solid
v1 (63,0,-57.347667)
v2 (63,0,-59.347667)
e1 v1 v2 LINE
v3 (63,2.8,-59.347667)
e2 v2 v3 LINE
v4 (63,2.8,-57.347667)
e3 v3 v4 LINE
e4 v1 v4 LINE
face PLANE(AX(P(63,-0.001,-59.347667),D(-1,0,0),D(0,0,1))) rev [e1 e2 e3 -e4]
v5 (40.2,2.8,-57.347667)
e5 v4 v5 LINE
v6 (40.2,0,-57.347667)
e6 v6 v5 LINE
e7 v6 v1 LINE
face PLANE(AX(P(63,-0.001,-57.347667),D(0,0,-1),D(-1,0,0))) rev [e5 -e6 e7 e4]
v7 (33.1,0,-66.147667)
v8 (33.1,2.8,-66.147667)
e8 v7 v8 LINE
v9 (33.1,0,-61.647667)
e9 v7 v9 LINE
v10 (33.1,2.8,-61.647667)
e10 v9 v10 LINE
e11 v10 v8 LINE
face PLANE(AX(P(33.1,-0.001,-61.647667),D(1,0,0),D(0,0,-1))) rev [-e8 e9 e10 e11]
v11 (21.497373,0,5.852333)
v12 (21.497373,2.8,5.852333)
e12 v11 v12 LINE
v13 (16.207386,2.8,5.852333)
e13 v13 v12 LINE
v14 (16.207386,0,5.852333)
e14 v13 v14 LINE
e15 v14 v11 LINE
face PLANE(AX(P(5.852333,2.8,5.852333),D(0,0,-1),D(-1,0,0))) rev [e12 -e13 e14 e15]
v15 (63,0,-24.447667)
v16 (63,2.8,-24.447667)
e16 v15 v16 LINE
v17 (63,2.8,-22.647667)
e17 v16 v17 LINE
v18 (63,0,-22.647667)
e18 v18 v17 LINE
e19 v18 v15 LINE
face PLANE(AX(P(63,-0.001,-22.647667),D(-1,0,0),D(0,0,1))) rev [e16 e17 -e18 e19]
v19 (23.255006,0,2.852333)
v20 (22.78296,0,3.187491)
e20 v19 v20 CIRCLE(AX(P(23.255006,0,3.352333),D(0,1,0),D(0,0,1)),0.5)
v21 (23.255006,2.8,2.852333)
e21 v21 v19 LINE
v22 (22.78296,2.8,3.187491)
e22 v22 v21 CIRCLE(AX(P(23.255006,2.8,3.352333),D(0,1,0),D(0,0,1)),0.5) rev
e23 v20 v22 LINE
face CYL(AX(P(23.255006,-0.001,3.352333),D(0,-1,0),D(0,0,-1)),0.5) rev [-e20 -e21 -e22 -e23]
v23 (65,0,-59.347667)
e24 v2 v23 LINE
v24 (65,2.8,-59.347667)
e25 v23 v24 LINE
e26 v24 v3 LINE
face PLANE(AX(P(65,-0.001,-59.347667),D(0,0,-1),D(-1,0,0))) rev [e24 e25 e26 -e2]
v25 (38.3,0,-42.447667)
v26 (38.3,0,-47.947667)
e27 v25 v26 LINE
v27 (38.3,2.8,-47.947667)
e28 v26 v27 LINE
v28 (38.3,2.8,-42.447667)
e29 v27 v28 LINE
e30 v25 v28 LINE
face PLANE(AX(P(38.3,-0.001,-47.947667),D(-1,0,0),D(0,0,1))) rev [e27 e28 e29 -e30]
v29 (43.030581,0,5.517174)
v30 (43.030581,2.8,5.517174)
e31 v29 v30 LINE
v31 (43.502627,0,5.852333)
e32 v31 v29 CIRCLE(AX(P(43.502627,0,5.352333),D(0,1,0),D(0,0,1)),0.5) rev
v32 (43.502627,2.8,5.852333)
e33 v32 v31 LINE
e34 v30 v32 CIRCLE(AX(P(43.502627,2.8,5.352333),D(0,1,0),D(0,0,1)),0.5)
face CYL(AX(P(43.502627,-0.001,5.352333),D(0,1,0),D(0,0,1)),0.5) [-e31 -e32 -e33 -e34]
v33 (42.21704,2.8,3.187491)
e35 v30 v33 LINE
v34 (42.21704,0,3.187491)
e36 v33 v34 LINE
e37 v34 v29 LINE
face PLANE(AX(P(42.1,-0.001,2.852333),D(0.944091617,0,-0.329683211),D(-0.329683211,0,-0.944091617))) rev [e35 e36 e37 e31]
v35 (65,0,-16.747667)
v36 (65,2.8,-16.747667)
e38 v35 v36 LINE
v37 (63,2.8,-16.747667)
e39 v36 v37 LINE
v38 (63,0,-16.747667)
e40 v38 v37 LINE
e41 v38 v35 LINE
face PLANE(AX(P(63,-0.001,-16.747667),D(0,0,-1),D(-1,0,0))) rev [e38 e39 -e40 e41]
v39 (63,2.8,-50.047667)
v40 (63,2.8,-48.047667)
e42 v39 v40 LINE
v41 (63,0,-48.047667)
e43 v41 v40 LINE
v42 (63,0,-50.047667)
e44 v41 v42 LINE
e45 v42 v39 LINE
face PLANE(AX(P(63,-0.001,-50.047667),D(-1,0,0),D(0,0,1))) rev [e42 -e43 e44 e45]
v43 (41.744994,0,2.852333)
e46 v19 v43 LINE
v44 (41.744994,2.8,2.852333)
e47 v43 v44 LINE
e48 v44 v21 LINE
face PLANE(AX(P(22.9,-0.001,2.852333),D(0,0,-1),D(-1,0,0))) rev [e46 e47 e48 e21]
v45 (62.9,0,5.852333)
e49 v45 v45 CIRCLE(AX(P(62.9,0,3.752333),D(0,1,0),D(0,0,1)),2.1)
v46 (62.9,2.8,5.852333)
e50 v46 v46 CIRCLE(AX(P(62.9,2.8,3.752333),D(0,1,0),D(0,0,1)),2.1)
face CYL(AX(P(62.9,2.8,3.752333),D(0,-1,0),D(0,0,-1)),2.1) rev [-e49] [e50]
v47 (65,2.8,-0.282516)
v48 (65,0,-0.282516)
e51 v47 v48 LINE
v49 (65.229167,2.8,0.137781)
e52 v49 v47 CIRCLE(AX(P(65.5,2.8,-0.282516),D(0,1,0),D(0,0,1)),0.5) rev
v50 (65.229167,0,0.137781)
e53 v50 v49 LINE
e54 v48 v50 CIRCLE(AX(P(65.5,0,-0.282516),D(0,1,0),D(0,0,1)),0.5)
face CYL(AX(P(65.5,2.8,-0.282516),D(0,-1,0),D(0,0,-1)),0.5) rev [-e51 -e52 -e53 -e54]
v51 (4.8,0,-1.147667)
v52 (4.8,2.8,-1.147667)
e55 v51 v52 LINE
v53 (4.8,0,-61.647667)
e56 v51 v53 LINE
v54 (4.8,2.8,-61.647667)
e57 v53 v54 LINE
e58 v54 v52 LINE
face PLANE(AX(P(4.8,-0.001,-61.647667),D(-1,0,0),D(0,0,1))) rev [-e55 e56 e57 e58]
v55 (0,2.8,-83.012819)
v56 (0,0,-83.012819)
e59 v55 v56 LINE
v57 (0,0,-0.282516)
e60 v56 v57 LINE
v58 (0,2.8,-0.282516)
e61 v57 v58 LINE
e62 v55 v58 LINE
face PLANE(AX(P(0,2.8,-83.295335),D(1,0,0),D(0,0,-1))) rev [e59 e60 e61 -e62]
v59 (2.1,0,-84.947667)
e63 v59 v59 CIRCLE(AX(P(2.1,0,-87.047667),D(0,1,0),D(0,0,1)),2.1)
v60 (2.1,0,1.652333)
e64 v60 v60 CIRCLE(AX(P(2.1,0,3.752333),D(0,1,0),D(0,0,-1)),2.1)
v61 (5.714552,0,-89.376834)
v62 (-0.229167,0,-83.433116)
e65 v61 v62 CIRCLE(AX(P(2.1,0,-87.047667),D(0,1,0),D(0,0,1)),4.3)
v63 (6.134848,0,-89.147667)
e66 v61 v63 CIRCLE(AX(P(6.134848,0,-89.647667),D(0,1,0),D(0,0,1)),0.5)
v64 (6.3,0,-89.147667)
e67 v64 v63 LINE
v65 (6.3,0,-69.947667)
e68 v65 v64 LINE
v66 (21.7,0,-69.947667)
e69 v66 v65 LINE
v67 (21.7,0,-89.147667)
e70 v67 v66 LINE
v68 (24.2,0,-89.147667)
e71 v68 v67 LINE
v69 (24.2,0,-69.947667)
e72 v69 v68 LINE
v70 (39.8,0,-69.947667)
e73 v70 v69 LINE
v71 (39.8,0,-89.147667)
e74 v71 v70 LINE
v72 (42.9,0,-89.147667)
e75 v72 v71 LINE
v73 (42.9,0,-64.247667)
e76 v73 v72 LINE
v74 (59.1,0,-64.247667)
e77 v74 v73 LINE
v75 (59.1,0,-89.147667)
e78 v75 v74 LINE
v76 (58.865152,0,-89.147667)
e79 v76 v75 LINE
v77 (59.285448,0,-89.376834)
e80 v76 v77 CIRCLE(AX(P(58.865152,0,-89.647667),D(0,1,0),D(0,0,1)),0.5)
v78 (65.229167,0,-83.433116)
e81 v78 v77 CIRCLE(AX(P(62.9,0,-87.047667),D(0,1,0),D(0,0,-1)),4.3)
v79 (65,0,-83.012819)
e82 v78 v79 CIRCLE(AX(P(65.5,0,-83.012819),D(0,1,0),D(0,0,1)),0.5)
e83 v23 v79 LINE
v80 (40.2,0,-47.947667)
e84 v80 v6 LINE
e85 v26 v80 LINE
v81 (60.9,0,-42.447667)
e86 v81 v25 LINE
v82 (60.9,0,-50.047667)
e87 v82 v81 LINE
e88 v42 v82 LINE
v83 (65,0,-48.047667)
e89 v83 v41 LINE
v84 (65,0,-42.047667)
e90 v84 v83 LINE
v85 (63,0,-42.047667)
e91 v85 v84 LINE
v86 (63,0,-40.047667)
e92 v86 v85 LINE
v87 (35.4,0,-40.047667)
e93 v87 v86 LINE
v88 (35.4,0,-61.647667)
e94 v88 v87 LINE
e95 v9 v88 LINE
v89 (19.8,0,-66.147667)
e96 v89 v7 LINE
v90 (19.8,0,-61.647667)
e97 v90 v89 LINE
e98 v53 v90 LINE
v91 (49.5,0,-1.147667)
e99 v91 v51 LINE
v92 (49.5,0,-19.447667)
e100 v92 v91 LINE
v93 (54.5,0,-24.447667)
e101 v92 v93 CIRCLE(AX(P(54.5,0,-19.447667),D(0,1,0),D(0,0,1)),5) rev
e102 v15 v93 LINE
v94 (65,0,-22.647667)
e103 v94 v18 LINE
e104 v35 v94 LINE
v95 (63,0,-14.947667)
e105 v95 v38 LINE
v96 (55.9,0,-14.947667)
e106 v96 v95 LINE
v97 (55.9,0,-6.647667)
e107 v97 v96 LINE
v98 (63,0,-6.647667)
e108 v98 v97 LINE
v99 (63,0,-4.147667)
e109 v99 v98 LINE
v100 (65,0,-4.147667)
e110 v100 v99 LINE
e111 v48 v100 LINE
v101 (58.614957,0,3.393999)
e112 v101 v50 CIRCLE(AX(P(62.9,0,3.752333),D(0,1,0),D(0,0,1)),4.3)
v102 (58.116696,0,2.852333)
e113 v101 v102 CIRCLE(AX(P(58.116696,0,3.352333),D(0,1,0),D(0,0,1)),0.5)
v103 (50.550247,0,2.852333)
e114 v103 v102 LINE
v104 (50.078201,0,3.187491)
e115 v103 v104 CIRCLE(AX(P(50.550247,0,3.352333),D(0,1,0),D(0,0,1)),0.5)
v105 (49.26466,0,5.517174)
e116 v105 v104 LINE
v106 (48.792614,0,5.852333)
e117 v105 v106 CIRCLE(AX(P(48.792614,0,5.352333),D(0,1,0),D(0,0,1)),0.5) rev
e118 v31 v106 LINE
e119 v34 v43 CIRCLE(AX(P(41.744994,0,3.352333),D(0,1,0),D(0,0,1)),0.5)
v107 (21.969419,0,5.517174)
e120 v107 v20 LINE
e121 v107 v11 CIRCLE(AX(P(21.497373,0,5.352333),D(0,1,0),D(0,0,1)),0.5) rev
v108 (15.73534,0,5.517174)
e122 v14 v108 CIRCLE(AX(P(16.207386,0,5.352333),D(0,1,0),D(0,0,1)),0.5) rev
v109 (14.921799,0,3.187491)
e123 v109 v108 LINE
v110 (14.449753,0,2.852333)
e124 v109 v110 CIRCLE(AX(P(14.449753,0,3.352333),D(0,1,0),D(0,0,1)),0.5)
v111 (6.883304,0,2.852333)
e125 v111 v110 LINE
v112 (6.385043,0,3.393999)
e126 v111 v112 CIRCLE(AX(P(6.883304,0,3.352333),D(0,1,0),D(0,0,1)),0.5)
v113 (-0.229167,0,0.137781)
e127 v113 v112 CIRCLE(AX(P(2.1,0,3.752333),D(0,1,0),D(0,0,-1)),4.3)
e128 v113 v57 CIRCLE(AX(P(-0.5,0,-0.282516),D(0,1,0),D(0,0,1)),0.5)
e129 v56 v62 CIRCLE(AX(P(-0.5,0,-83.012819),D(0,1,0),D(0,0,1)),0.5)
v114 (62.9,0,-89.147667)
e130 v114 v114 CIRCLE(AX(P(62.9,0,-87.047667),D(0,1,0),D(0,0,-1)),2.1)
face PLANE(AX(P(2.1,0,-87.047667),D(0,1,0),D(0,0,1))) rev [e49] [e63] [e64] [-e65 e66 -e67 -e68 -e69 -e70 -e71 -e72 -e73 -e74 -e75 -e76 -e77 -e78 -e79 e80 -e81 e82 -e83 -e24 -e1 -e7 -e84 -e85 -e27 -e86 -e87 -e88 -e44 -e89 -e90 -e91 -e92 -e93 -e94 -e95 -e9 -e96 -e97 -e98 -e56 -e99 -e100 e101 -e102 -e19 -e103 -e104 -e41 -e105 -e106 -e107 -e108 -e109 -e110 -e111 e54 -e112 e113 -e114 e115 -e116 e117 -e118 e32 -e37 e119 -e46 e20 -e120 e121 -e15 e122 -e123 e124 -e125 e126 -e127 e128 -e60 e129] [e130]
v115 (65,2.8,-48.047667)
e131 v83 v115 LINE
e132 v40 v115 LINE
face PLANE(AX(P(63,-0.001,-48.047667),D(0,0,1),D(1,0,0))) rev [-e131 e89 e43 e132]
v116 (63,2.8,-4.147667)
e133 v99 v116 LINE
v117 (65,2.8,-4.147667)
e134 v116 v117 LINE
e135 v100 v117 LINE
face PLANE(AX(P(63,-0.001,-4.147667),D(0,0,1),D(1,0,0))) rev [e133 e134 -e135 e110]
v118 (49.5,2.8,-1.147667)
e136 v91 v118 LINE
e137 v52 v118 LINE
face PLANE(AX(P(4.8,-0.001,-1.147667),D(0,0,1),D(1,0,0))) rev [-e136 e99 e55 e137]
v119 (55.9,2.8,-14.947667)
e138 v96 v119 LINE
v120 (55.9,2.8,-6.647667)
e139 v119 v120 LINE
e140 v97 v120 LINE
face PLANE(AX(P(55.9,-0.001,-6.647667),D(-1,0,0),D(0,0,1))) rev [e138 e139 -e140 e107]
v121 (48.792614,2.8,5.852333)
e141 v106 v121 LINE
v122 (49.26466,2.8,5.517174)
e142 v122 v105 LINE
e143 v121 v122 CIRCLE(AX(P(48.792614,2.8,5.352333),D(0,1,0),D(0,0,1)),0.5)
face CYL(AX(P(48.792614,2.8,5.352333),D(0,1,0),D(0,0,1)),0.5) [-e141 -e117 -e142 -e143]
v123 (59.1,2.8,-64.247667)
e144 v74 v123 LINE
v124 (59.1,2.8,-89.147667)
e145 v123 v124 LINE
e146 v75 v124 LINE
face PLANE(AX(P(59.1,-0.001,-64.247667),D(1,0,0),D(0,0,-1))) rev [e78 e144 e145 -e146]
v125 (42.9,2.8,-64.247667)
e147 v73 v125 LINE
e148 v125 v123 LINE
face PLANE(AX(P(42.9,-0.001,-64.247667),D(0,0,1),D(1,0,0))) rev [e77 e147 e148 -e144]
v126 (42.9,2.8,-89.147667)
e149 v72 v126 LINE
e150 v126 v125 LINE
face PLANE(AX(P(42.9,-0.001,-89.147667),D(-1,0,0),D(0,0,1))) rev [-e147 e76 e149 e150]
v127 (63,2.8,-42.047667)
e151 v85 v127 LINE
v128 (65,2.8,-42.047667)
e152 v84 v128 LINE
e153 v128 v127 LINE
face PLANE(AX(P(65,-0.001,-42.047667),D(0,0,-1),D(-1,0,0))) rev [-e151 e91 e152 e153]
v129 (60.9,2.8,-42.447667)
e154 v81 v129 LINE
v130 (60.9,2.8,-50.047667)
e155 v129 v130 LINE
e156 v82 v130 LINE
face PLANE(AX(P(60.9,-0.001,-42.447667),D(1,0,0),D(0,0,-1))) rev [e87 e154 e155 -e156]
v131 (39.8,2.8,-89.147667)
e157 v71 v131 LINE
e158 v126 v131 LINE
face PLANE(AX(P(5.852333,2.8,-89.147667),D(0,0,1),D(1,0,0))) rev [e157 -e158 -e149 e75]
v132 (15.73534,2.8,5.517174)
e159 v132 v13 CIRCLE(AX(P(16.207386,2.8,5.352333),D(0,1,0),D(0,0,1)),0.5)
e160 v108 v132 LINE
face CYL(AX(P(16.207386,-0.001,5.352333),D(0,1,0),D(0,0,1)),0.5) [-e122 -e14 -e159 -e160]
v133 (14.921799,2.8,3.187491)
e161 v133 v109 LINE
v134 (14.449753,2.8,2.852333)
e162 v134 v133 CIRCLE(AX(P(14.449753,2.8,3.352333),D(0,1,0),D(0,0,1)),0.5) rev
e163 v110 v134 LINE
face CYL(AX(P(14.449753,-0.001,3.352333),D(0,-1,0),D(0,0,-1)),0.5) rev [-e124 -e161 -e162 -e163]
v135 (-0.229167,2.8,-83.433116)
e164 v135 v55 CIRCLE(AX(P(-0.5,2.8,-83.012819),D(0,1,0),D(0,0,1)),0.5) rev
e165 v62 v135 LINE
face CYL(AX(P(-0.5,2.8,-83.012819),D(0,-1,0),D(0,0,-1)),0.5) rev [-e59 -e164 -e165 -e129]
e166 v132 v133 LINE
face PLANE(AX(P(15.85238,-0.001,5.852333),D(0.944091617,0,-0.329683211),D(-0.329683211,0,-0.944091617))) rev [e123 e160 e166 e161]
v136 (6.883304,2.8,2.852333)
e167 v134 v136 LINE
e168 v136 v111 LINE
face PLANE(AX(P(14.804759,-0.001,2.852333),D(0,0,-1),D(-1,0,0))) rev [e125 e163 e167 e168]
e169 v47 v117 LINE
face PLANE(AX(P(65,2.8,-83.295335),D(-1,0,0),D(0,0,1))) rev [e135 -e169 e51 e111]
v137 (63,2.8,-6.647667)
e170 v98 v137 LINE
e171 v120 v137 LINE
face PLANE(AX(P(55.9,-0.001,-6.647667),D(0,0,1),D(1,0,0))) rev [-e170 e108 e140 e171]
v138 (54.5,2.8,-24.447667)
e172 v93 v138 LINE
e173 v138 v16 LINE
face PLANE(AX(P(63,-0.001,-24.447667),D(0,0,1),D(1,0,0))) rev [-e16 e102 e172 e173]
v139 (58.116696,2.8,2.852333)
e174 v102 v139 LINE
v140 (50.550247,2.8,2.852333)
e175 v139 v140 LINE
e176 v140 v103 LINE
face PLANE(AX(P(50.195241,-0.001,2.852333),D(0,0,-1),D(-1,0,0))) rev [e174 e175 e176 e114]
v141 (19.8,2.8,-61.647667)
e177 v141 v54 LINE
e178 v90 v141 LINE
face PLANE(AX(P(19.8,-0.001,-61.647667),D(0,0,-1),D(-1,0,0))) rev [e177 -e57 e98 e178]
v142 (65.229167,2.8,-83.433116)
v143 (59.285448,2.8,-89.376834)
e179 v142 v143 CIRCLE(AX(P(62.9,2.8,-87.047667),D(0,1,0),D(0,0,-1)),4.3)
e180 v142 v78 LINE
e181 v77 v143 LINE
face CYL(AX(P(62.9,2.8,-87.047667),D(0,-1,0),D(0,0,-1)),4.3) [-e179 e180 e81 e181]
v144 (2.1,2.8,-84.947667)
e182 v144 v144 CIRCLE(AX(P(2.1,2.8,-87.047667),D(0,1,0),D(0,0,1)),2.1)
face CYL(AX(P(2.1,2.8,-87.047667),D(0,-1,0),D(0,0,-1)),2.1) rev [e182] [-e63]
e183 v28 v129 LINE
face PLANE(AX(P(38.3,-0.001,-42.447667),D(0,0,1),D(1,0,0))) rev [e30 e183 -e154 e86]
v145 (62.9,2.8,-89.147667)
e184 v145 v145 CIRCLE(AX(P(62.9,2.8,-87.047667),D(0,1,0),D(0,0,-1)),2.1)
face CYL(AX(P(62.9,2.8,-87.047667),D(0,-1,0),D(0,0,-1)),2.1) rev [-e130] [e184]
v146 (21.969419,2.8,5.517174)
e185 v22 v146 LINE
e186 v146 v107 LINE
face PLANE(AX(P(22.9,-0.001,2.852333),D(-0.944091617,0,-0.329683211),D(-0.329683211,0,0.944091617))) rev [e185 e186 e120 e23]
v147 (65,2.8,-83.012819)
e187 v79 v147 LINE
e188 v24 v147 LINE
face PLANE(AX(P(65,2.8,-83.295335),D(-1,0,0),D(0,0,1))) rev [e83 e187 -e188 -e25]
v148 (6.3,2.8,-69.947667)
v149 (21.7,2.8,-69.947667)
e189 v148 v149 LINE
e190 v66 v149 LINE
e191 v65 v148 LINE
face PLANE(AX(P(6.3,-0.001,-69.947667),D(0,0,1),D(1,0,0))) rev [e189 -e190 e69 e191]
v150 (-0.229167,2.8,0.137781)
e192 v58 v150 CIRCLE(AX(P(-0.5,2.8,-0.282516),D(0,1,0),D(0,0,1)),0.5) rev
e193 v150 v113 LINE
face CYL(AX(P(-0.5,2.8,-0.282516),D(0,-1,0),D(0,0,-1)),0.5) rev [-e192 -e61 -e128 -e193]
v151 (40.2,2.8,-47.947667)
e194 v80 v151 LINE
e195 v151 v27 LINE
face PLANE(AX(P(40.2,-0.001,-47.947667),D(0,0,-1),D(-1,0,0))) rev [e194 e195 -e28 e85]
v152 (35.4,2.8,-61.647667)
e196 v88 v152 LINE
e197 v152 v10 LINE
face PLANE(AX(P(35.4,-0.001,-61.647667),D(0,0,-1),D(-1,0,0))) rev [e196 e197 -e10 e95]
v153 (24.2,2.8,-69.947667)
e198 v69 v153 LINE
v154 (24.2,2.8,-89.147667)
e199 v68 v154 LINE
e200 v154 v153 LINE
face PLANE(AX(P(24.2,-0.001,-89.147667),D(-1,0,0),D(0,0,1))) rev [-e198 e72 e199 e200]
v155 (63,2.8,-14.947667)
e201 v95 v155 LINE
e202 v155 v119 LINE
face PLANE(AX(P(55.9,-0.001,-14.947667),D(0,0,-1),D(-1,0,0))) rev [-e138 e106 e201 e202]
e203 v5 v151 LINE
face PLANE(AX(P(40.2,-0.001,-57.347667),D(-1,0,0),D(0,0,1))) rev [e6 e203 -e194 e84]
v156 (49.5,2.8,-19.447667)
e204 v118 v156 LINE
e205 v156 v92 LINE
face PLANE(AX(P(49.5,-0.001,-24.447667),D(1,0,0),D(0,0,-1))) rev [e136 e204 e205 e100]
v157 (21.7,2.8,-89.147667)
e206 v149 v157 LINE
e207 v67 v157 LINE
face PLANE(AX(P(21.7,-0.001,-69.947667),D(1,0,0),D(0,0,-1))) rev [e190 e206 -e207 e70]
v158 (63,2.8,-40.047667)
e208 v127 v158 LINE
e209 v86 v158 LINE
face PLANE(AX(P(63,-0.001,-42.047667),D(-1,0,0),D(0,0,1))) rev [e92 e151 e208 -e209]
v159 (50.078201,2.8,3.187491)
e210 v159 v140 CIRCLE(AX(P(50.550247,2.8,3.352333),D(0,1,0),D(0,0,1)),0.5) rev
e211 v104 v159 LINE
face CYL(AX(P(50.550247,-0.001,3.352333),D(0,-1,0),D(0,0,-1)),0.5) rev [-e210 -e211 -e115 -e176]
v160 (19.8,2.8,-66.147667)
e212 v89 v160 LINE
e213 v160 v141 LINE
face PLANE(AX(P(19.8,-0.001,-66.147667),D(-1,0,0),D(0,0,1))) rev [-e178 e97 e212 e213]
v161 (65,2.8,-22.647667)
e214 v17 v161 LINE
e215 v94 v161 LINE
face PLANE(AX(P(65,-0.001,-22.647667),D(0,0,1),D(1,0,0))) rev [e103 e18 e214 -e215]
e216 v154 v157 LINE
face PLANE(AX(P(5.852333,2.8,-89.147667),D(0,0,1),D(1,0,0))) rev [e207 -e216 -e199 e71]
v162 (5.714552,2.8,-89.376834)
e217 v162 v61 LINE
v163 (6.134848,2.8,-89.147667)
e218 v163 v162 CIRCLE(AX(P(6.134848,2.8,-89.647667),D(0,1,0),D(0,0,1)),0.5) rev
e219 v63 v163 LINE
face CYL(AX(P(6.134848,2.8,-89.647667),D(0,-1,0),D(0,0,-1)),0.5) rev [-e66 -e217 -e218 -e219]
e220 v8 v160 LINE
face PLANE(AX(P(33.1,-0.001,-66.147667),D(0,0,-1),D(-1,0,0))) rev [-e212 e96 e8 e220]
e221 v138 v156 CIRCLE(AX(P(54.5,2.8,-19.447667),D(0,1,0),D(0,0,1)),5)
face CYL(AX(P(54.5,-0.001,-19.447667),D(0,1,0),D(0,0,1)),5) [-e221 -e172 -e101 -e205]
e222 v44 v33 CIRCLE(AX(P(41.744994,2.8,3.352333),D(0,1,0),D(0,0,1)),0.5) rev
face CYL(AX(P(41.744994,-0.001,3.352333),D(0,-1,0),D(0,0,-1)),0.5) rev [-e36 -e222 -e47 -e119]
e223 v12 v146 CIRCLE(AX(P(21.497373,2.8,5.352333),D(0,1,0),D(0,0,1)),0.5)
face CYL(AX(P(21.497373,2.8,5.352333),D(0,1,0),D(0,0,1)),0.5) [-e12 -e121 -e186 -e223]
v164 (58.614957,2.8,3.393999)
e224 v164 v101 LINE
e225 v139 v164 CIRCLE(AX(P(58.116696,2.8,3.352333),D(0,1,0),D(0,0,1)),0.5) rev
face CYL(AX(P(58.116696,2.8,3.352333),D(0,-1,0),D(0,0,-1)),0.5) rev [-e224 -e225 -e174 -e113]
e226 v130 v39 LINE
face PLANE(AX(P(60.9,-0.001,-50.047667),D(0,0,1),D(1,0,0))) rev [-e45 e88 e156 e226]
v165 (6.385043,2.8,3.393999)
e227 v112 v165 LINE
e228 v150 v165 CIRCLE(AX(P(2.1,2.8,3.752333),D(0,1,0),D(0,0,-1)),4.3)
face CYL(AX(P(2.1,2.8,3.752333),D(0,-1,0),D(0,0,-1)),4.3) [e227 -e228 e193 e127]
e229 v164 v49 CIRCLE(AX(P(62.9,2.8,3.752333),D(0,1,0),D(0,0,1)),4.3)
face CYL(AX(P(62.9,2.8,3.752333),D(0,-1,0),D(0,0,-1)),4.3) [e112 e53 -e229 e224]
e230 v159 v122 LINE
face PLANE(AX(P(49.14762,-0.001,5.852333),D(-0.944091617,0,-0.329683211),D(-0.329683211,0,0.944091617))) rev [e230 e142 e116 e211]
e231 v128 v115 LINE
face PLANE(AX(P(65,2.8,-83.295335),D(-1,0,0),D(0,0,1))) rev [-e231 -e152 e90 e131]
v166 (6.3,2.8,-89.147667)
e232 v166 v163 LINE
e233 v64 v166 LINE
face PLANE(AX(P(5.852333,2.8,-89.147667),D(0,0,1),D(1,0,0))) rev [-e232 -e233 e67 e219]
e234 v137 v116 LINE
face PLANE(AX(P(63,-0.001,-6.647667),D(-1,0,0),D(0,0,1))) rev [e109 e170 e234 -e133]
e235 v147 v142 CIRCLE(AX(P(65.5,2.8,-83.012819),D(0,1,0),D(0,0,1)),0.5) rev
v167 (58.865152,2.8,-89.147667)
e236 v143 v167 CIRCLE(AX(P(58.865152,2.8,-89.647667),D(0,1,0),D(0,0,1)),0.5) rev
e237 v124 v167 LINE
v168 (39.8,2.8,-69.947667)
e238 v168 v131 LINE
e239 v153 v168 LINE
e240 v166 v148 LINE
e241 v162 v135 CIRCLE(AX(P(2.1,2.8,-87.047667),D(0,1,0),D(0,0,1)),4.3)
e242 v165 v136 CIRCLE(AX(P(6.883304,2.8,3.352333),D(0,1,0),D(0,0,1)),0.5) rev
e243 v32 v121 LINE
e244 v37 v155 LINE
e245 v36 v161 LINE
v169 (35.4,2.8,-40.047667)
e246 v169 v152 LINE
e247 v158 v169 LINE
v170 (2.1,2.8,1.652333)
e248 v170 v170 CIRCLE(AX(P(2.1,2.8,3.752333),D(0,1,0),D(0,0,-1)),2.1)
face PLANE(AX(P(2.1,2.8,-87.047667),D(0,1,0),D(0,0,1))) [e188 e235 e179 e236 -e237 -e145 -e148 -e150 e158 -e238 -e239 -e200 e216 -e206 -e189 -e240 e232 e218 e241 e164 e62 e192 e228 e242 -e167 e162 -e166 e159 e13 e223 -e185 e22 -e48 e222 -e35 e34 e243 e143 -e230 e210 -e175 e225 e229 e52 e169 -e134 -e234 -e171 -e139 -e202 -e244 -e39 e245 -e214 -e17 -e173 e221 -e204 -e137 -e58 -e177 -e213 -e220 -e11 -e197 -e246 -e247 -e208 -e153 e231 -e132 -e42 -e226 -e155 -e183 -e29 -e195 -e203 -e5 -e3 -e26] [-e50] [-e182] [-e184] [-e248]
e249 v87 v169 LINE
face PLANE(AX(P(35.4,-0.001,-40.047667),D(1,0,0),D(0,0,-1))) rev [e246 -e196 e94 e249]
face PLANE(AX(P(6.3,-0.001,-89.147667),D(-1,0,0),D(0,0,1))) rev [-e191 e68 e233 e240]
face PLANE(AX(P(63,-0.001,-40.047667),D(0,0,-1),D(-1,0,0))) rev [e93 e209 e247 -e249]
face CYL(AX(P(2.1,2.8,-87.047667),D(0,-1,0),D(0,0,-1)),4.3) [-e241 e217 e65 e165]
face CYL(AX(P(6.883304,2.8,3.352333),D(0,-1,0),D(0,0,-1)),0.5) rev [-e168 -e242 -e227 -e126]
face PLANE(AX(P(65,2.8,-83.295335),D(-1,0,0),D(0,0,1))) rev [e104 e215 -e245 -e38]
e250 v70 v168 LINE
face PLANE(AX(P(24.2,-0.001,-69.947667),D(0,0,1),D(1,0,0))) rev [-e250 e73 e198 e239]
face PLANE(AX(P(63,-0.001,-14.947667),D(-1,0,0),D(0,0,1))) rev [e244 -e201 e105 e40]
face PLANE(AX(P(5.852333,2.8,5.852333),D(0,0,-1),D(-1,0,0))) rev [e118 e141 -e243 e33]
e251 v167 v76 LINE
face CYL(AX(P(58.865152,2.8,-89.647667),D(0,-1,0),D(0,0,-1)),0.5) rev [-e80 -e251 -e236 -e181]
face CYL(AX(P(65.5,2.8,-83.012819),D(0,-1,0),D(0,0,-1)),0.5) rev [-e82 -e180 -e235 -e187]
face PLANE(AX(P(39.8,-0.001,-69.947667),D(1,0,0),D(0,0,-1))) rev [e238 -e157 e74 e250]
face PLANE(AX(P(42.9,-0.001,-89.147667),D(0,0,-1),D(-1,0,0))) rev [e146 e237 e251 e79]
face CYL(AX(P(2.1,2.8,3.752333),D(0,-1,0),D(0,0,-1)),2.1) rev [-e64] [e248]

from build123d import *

# Parameters (mm, degrees)
BASEPLATE_OUTLINE_R = 2.1
BASEPLATE_DEPTH     = 2.8
CUT_EXTRUDE1_REACH  = 115.438
SKETCH3_W           = 15.4
SKETCH3_H           = 19.2
SKETCH3_W_2         = 15.6
SKETCH3_W_3         = 16.2
SKETCH3_H_2         = 24.9
CUT_EXTRUDE2_REACH  = 115.438
FILLET1_R           = 5


# Read off the part's stored shape, not the designer's step: BasePlate
with BuildPart() as part:
    # BasePlate outline → BasePlate (new body)
    with BuildSketch(Plane(origin=(0, 0, 0), x_dir=(1, 0, 0), z_dir=(0, 1, 0))):
        with BuildLine():
            Line((43.502626614, -5.852332608), (48.792614178, -5.852332608))
            ThreePointArc((48.792614178, -5.852332608), (49.082078508, -5.760021707), (49.264659986, -5.517174213))
            Line((49.264659986, -5.517174213), (50.078201202, -3.187491002))
            ThreePointArc((50.078201202, -3.187491002), (50.26078268, -2.944643509), (50.55024701, -2.852332608))
            Line((50.55024701, -2.852332608), (58.116695703, -2.852332608))
            ThreePointArc((58.116695703, -2.852332608), (58.484685739, -3.013831008), (58.614956567, -3.393999275))
            ThreePointArc((58.614956567, -3.393999275), (64.799237397, -7.61016844), (65.229166667, -0.137781095))
            ThreePointArc((65.229166667, -0.137781095), (65.061014427, 0.043158816), (65, 0.282515593))
            Line((65, 0.282515593), (65, 83.012819192))
            ThreePointArc((65, 83.012819192), (65.061014427, 83.252175969), (65.229166667, 83.433115879))
            ThreePointArc((65.229166667, 83.433115879), (65.940559159, 90.088226551), (59.285448487, 89.376834059))
            ThreePointArc((59.285448487, 89.376834059), (59.104508577, 89.208681819), (58.8651518, 89.147667392))
            Line((58.8651518, 89.147667392), (6.1348482, 89.147667392))
            ThreePointArc((6.1348482, 89.147667392), (5.895491423, 89.208681819), (5.714551513, 89.376834059))
            ThreePointArc((5.714551513, 89.376834059), (-0.940559159, 90.088226551), (-0.229166667, 83.433115879))
            ThreePointArc((-0.229166667, 83.433115879), (-0.061014427, 83.252175969), (0, 83.012819192))
            Line((0, 83.012819192), (0, 0.282515593))
            ThreePointArc((0, 0.282515593), (-0.061014427, 0.043158816), (-0.229166667, -0.137781095))
            ThreePointArc((-0.229166667, -0.137781095), (0.200762603, -7.61016844), (6.385043433, -3.393999275))
            ThreePointArc((6.385043433, -3.393999275), (6.515314261, -3.013831008), (6.883304297, -2.852332608))
            Line((6.883304297, -2.852332608), (14.44975299, -2.852332608))
            ThreePointArc((14.44975299, -2.852332608), (14.73921732, -2.944643509), (14.921798798, -3.187491002))
            Line((14.921798798, -3.187491002), (15.735340014, -5.517174213))
            ThreePointArc((15.735340014, -5.517174213), (15.917921492, -5.760021707), (16.207385822, -5.852332608))
            Line((16.207385822, -5.852332608), (21.497373386, -5.852332608))
            ThreePointArc((21.497373386, -5.852332608), (21.786837716, -5.760021707), (21.969419194, -5.517174213))
            Line((21.969419194, -5.517174213), (22.78296041, -3.187491002))
            ThreePointArc((22.78296041, -3.187491002), (22.965541888, -2.944643509), (23.255006218, -2.852332608))
            Line((23.255006218, -2.852332608), (41.744993782, -2.852332608))
            ThreePointArc((41.744993782, -2.852332608), (42.034458112, -2.944643509), (42.21703959, -3.187491002))
            Line((42.21703959, -3.187491002), (43.030580806, -5.517174213))
            ThreePointArc((43.030580806, -5.517174213), (43.213162284, -5.760021707), (43.502626614, -5.852332608))
        make_face()
        with Locations((2.1, -3.752332608)):
            Circle(BASEPLATE_OUTLINE_R, mode=Mode.SUBTRACT)
        with Locations((62.9, -3.752332608)):
            Circle(BASEPLATE_OUTLINE_R, mode=Mode.SUBTRACT)
        with Locations((2.1, 87.047667392)):
            Circle(BASEPLATE_OUTLINE_R, mode=Mode.SUBTRACT)
        with Locations((62.9, 87.047667392)):
            Circle(BASEPLATE_OUTLINE_R, mode=Mode.SUBTRACT)
    extrude(amount=BASEPLATE_DEPTH)

    # Sketch3 → Cut-Extrude1 (cut, up to next)
    with BuildSketch(Plane(origin=(0, 2.8, 0), x_dir=(1, 0, 0), z_dir=(0, 1, 0)), mode=Mode.PRIVATE) as cut_extrude1_sk1:
        Polygon((4.8, 1.147667392), (49.5, 1.147667392), (49.5, 24.447667392), (63, 24.447667392), (63, 22.647667392), (65, 22.647667392), (65, 42.047667392), (63, 42.047667392), (63, 40.047667392), (35.4, 40.047667392), (35.4, 61.647667392), (33.1, 61.647667392), (33.1, 66.147667392), (19.8, 66.147667392), (19.8, 61.647667392), (4.8, 61.647667392), align=None)
    cut_extrude1_tool1 = extrude(cut_extrude1_sk1.sketch, amount=-CUT_EXTRUDE1_REACH, mode=Mode.PRIVATE) & part.part
    # Sketch3 → Cut-Extrude1 (cut, up to next)
    with BuildSketch(Plane(origin=(0, 2.8, 0), x_dir=(1, 0, 0), z_dir=(0, 1, 0)), mode=Mode.PRIVATE) as cut_extrude1_sk2:
        Polygon((55.9, 6.647667392), (63, 6.647667392), (63, 4.147667392), (65, 4.147667392), (65, 16.747667392), (63, 16.747667392), (63, 14.947667392), (55.9, 14.947667392), align=None)
    cut_extrude1_tool2 = extrude(cut_extrude1_sk2.sketch, amount=-CUT_EXTRUDE1_REACH, mode=Mode.PRIVATE) & part.part
    # Sketch3 → Cut-Extrude1 (cut, up to next)
    with BuildSketch(Plane(origin=(0, 2.8, 0), x_dir=(1, 0, 0), z_dir=(0, 1, 0)), mode=Mode.PRIVATE) as cut_extrude1_sk3:
        with Locations((14, 79.547667392)):
            Rectangle(SKETCH3_W, SKETCH3_H)
    cut_extrude1_tool3 = extrude(cut_extrude1_sk3.sketch, amount=-CUT_EXTRUDE1_REACH, mode=Mode.PRIVATE) & part.part
    # Sketch3 → Cut-Extrude1 (cut, up to next)
    with BuildSketch(Plane(origin=(0, 2.8, 0), x_dir=(1, 0, 0), z_dir=(0, 1, 0)), mode=Mode.PRIVATE) as cut_extrude1_sk4:
        with Locations((32, 79.547667392)):
            Rectangle(SKETCH3_W_2, SKETCH3_H)
    cut_extrude1_tool4 = extrude(cut_extrude1_sk4.sketch, amount=-CUT_EXTRUDE1_REACH, mode=Mode.PRIVATE) & part.part
    # Sketch3 → Cut-Extrude1 (cut, up to next)
    with BuildSketch(Plane(origin=(0, 2.8, 0), x_dir=(1, 0, 0), z_dir=(0, 1, 0)), mode=Mode.PRIVATE) as cut_extrude1_sk5:
        with Locations((51, 76.697667392)):
            Rectangle(SKETCH3_W_3, SKETCH3_H_2)
    cut_extrude1_tool5 = extrude(cut_extrude1_sk5.sketch, amount=-CUT_EXTRUDE1_REACH, mode=Mode.PRIVATE) & part.part
    add(cut_extrude1_tool1.solids().sort_by_distance((28.204461, 2.8, -30.008726))[0], mode=Mode.SUBTRACT)
    add(cut_extrude1_tool2.solids().sort_by_distance((60.812891, 2.8, -10.69283))[0], mode=Mode.SUBTRACT)
    add(cut_extrude1_tool3.solids().sort_by_distance((14, 2.8, -79.547667))[0], mode=Mode.SUBTRACT)
    add(cut_extrude1_tool4.solids().sort_by_distance((32, 2.8, -79.547667))[0], mode=Mode.SUBTRACT)
    add(cut_extrude1_tool5.solids().sort_by_distance((51, 2.8, -76.697667))[0], mode=Mode.SUBTRACT)

    # Sketch4 → Cut-Extrude2 (cut, up to next)
    with BuildSketch(Plane(origin=(0, 2.8, 0), x_dir=(1, 0, 0), z_dir=(0, 1, 0)), mode=Mode.PRIVATE) as cut_extrude2_sk1:
        Polygon((65, 59.347667392), (63, 59.347667392), (63, 57.347667392), (40.2, 57.347667392), (40.2, 47.947667392), (38.3, 47.947667392), (38.3, 42.447667392), (60.9, 42.447667392), (60.9, 50.047667392), (63, 50.047667392), (63, 48.047667392), (65, 48.047667392), align=None)
    cut_extrude2_tool1 = extrude(cut_extrude2_sk1.sketch, amount=-CUT_EXTRUDE2_REACH, mode=Mode.PRIVATE) & part.part
    add(cut_extrude2_tool1.solids().sort_by_distance((51.560754, 2.8, -50.163969))[0], mode=Mode.SUBTRACT)

    # Fillet1
    fillet1_edges = [part.edges().sort_by_distance(p)[0] for p in [
        (49.5, 1.4, -24.447667392),
    ]]
    fillet(fillet1_edges, radius=FILLET1_R)


solid = part.part
